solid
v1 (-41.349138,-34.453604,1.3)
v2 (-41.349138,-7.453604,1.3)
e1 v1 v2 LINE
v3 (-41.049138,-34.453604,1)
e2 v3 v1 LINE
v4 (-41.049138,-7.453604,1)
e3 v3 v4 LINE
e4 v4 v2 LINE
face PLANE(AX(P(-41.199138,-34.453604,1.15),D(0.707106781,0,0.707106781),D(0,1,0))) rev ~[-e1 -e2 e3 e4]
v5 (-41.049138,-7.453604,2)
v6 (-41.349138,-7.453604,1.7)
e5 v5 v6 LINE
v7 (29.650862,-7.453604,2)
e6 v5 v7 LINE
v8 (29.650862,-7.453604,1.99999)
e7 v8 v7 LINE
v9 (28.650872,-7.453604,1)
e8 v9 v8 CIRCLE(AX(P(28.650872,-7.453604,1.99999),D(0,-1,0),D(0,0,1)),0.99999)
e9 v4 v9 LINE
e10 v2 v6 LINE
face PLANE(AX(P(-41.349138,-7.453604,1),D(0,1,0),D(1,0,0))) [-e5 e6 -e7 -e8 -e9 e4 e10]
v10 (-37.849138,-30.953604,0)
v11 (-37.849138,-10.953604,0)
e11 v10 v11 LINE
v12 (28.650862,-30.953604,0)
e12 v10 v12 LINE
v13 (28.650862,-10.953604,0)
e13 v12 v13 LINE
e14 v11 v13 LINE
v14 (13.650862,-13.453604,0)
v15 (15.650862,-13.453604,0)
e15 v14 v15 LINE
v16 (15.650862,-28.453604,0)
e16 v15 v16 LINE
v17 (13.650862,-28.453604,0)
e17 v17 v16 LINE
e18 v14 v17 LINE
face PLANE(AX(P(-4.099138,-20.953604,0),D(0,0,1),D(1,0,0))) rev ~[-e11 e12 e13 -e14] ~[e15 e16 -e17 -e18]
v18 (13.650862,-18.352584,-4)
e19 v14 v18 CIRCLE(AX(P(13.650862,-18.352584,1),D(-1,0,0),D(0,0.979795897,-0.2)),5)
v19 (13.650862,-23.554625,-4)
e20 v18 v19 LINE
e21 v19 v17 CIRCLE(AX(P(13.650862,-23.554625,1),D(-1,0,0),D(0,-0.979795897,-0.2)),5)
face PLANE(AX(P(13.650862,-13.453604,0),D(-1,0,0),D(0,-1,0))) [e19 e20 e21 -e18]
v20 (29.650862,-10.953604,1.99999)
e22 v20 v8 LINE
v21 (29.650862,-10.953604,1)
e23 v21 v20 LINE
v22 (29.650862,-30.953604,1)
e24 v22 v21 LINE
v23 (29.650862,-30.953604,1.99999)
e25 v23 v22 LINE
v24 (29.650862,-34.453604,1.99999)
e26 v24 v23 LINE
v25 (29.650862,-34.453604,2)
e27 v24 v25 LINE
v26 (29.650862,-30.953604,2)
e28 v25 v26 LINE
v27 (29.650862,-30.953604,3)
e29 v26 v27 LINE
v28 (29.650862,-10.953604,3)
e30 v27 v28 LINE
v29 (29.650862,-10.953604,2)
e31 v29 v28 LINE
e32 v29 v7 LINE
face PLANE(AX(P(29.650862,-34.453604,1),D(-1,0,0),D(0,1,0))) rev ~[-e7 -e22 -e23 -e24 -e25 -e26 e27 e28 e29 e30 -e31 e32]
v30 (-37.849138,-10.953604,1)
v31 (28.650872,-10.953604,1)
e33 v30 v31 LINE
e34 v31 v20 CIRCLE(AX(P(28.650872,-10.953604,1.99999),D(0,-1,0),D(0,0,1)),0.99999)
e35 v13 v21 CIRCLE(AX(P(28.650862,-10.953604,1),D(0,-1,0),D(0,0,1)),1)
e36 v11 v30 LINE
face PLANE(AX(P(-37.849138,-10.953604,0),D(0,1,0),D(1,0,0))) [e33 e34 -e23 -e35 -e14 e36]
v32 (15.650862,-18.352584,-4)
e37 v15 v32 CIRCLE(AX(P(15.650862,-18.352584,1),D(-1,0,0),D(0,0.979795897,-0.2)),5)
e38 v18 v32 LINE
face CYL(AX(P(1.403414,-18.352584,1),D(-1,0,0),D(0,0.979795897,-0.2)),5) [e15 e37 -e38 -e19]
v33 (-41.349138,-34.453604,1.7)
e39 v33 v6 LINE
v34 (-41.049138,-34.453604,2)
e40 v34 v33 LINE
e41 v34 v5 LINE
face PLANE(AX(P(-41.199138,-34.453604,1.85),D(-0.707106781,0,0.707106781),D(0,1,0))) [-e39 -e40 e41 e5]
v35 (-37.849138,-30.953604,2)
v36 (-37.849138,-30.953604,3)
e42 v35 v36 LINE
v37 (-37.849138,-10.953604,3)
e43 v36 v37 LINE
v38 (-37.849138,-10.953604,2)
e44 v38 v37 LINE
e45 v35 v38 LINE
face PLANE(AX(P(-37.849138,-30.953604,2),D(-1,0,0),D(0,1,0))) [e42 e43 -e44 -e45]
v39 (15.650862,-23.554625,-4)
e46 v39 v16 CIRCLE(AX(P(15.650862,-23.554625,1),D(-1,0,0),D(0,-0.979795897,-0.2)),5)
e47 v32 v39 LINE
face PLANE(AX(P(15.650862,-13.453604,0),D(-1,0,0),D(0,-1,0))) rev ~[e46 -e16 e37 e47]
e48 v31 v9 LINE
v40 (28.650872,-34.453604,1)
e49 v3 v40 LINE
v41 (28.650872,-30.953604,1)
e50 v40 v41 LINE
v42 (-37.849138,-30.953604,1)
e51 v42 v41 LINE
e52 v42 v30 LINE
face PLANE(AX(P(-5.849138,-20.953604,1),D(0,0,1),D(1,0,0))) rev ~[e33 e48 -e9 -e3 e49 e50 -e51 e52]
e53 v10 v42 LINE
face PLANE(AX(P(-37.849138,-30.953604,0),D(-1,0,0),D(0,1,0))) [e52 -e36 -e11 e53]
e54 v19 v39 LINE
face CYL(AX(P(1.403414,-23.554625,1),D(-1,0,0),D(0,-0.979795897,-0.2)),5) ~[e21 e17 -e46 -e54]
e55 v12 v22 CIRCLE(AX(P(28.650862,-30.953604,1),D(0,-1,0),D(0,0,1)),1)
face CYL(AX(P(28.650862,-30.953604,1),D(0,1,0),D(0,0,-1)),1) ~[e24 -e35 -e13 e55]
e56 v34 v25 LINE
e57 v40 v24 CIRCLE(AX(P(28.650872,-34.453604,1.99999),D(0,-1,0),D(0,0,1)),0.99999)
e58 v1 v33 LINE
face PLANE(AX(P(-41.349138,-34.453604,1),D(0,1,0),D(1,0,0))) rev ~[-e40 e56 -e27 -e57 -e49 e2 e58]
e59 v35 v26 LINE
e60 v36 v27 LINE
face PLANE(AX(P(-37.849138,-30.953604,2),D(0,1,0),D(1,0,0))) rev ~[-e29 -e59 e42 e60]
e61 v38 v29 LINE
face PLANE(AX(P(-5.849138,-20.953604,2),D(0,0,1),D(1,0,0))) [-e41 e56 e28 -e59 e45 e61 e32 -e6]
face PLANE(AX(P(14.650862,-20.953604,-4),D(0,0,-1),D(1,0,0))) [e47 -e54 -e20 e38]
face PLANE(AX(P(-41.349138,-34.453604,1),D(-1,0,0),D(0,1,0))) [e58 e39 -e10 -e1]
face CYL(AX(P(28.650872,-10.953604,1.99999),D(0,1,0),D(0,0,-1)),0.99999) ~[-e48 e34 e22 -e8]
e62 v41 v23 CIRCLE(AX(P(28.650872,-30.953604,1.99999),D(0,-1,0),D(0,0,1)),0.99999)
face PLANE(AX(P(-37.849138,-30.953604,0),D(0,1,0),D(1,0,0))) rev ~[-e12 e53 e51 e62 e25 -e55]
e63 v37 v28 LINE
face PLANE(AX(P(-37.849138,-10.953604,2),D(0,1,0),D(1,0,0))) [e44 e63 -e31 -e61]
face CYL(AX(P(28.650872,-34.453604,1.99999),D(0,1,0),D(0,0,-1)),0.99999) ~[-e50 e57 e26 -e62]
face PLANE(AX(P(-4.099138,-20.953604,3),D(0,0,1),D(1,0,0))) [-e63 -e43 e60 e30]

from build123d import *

# Parameters (mm, degrees)
F0_W         = 67.5
F0_H         = 20
F1_DEPTH     = 1
F2_W         = 71
F2_H         = 27
F3_DEPTH     = 1
F4_W         = 67.5
F4_H         = 20
F5_DEPTH     = 1
F6_R         = 0.99999
F7_R         = 1
F8_W         = 2
F8_H         = 15
F9_DEPTH     = 4
F10_T1_DEPTH = 26.4948974279
F11_SIZE     = 0.3


# Not quite as in the source:
# - a fillet or chamfer that OpenCascade refuses, or shapes differently, is made with other operations: its cross-section is extruded or revolved along the edge and cut away or added
# - a fillet or chamfer is up to 0.001 mm smaller than in the source, because OpenCascade refuses the exact size


with BuildPart() as f1:
    # F0 (on Top) → F1 (new body)
    with BuildSketch(Plane.XY):
        with Locations((-4.0991377383, -20.9536040443)):
            Rectangle(F0_W, F0_H)
    extrude(amount=F1_DEPTH)

    # F2 (on face) → F3 (join)
    with BuildSketch(Plane.XY.offset(1)):
        with Locations((-5.8491377383, -20.9536040443)):
            Rectangle(F2_W, F2_H)
    extrude(amount=F3_DEPTH)

    # F4 (on face) → F5 (join)
    with BuildSketch(Plane.XY.offset(2)):
        with Locations((-4.0991377383, -20.9536040443)):
            Rectangle(F4_W, F4_H)
    extrude(amount=F5_DEPTH)

    # F6 (radius 1 in the source; OpenCascade refuses exactly that, so slightly less here)
    f6_edges = [f1.edges().sort_by_distance(p)[0] for p in [
        (29.650862, -9.203604, 1),
        (29.650862, -32.703604, 1),
    ]]
    fillet(f6_edges, radius=F6_R)

    # F7
    f7_edges = [f1.edges().sort_by_distance(p)[0] for p in [
        (29.650862, -20.953604, 0),
    ]]
    fillet(f7_edges, radius=F7_R)

    # F8 (on face) → F9 (join)
    with BuildSketch(Plane(origin=(0, 0, 0), x_dir=(1, 0, 0), z_dir=(0, 0, -1))):
        with Locations((14.6508622617, 20.9536040443)):
            Rectangle(F8_W, F8_H)
    extrude(amount=F9_DEPTH)

    # F10: fillet of radius 5 on 2 edges, made by hand

    # F10_s2 → F10_t1 (cut)
    with BuildSketch(Plane.YZ.offset(1.4034135477)):
        with BuildLine():
            ThreePointArc((-28.4536040443, 0), (-26.7169022189, -2.8729833462), (-23.5546245587, -4))
            Line((-23.5546245587, -4), (-28.4536040443, -4))
            Line((-28.4536040443, -4), (-28.4536040443, 0))
        make_face()
        with BuildLine():
            ThreePointArc((-13.4536040443, 0), (-15.1903058697, -2.8729833462), (-18.3525835299, -4))
            Line((-18.3525835299, -4), (-13.4536040443, -4))
            Line((-13.4536040443, -4), (-13.4536040443, 0))
        make_face()
    extrude(amount=F10_T1_DEPTH, mode=Mode.SUBTRACT)

    # F11
    f11_edges = [f1.edges().sort_by_distance(p)[0] for p in [
        (-41.349138, -20.953604, 2),
        (-41.349138, -20.953604, 1),
    ]]
    chamfer(f11_edges, length=F11_SIZE)


solid = f1.part
